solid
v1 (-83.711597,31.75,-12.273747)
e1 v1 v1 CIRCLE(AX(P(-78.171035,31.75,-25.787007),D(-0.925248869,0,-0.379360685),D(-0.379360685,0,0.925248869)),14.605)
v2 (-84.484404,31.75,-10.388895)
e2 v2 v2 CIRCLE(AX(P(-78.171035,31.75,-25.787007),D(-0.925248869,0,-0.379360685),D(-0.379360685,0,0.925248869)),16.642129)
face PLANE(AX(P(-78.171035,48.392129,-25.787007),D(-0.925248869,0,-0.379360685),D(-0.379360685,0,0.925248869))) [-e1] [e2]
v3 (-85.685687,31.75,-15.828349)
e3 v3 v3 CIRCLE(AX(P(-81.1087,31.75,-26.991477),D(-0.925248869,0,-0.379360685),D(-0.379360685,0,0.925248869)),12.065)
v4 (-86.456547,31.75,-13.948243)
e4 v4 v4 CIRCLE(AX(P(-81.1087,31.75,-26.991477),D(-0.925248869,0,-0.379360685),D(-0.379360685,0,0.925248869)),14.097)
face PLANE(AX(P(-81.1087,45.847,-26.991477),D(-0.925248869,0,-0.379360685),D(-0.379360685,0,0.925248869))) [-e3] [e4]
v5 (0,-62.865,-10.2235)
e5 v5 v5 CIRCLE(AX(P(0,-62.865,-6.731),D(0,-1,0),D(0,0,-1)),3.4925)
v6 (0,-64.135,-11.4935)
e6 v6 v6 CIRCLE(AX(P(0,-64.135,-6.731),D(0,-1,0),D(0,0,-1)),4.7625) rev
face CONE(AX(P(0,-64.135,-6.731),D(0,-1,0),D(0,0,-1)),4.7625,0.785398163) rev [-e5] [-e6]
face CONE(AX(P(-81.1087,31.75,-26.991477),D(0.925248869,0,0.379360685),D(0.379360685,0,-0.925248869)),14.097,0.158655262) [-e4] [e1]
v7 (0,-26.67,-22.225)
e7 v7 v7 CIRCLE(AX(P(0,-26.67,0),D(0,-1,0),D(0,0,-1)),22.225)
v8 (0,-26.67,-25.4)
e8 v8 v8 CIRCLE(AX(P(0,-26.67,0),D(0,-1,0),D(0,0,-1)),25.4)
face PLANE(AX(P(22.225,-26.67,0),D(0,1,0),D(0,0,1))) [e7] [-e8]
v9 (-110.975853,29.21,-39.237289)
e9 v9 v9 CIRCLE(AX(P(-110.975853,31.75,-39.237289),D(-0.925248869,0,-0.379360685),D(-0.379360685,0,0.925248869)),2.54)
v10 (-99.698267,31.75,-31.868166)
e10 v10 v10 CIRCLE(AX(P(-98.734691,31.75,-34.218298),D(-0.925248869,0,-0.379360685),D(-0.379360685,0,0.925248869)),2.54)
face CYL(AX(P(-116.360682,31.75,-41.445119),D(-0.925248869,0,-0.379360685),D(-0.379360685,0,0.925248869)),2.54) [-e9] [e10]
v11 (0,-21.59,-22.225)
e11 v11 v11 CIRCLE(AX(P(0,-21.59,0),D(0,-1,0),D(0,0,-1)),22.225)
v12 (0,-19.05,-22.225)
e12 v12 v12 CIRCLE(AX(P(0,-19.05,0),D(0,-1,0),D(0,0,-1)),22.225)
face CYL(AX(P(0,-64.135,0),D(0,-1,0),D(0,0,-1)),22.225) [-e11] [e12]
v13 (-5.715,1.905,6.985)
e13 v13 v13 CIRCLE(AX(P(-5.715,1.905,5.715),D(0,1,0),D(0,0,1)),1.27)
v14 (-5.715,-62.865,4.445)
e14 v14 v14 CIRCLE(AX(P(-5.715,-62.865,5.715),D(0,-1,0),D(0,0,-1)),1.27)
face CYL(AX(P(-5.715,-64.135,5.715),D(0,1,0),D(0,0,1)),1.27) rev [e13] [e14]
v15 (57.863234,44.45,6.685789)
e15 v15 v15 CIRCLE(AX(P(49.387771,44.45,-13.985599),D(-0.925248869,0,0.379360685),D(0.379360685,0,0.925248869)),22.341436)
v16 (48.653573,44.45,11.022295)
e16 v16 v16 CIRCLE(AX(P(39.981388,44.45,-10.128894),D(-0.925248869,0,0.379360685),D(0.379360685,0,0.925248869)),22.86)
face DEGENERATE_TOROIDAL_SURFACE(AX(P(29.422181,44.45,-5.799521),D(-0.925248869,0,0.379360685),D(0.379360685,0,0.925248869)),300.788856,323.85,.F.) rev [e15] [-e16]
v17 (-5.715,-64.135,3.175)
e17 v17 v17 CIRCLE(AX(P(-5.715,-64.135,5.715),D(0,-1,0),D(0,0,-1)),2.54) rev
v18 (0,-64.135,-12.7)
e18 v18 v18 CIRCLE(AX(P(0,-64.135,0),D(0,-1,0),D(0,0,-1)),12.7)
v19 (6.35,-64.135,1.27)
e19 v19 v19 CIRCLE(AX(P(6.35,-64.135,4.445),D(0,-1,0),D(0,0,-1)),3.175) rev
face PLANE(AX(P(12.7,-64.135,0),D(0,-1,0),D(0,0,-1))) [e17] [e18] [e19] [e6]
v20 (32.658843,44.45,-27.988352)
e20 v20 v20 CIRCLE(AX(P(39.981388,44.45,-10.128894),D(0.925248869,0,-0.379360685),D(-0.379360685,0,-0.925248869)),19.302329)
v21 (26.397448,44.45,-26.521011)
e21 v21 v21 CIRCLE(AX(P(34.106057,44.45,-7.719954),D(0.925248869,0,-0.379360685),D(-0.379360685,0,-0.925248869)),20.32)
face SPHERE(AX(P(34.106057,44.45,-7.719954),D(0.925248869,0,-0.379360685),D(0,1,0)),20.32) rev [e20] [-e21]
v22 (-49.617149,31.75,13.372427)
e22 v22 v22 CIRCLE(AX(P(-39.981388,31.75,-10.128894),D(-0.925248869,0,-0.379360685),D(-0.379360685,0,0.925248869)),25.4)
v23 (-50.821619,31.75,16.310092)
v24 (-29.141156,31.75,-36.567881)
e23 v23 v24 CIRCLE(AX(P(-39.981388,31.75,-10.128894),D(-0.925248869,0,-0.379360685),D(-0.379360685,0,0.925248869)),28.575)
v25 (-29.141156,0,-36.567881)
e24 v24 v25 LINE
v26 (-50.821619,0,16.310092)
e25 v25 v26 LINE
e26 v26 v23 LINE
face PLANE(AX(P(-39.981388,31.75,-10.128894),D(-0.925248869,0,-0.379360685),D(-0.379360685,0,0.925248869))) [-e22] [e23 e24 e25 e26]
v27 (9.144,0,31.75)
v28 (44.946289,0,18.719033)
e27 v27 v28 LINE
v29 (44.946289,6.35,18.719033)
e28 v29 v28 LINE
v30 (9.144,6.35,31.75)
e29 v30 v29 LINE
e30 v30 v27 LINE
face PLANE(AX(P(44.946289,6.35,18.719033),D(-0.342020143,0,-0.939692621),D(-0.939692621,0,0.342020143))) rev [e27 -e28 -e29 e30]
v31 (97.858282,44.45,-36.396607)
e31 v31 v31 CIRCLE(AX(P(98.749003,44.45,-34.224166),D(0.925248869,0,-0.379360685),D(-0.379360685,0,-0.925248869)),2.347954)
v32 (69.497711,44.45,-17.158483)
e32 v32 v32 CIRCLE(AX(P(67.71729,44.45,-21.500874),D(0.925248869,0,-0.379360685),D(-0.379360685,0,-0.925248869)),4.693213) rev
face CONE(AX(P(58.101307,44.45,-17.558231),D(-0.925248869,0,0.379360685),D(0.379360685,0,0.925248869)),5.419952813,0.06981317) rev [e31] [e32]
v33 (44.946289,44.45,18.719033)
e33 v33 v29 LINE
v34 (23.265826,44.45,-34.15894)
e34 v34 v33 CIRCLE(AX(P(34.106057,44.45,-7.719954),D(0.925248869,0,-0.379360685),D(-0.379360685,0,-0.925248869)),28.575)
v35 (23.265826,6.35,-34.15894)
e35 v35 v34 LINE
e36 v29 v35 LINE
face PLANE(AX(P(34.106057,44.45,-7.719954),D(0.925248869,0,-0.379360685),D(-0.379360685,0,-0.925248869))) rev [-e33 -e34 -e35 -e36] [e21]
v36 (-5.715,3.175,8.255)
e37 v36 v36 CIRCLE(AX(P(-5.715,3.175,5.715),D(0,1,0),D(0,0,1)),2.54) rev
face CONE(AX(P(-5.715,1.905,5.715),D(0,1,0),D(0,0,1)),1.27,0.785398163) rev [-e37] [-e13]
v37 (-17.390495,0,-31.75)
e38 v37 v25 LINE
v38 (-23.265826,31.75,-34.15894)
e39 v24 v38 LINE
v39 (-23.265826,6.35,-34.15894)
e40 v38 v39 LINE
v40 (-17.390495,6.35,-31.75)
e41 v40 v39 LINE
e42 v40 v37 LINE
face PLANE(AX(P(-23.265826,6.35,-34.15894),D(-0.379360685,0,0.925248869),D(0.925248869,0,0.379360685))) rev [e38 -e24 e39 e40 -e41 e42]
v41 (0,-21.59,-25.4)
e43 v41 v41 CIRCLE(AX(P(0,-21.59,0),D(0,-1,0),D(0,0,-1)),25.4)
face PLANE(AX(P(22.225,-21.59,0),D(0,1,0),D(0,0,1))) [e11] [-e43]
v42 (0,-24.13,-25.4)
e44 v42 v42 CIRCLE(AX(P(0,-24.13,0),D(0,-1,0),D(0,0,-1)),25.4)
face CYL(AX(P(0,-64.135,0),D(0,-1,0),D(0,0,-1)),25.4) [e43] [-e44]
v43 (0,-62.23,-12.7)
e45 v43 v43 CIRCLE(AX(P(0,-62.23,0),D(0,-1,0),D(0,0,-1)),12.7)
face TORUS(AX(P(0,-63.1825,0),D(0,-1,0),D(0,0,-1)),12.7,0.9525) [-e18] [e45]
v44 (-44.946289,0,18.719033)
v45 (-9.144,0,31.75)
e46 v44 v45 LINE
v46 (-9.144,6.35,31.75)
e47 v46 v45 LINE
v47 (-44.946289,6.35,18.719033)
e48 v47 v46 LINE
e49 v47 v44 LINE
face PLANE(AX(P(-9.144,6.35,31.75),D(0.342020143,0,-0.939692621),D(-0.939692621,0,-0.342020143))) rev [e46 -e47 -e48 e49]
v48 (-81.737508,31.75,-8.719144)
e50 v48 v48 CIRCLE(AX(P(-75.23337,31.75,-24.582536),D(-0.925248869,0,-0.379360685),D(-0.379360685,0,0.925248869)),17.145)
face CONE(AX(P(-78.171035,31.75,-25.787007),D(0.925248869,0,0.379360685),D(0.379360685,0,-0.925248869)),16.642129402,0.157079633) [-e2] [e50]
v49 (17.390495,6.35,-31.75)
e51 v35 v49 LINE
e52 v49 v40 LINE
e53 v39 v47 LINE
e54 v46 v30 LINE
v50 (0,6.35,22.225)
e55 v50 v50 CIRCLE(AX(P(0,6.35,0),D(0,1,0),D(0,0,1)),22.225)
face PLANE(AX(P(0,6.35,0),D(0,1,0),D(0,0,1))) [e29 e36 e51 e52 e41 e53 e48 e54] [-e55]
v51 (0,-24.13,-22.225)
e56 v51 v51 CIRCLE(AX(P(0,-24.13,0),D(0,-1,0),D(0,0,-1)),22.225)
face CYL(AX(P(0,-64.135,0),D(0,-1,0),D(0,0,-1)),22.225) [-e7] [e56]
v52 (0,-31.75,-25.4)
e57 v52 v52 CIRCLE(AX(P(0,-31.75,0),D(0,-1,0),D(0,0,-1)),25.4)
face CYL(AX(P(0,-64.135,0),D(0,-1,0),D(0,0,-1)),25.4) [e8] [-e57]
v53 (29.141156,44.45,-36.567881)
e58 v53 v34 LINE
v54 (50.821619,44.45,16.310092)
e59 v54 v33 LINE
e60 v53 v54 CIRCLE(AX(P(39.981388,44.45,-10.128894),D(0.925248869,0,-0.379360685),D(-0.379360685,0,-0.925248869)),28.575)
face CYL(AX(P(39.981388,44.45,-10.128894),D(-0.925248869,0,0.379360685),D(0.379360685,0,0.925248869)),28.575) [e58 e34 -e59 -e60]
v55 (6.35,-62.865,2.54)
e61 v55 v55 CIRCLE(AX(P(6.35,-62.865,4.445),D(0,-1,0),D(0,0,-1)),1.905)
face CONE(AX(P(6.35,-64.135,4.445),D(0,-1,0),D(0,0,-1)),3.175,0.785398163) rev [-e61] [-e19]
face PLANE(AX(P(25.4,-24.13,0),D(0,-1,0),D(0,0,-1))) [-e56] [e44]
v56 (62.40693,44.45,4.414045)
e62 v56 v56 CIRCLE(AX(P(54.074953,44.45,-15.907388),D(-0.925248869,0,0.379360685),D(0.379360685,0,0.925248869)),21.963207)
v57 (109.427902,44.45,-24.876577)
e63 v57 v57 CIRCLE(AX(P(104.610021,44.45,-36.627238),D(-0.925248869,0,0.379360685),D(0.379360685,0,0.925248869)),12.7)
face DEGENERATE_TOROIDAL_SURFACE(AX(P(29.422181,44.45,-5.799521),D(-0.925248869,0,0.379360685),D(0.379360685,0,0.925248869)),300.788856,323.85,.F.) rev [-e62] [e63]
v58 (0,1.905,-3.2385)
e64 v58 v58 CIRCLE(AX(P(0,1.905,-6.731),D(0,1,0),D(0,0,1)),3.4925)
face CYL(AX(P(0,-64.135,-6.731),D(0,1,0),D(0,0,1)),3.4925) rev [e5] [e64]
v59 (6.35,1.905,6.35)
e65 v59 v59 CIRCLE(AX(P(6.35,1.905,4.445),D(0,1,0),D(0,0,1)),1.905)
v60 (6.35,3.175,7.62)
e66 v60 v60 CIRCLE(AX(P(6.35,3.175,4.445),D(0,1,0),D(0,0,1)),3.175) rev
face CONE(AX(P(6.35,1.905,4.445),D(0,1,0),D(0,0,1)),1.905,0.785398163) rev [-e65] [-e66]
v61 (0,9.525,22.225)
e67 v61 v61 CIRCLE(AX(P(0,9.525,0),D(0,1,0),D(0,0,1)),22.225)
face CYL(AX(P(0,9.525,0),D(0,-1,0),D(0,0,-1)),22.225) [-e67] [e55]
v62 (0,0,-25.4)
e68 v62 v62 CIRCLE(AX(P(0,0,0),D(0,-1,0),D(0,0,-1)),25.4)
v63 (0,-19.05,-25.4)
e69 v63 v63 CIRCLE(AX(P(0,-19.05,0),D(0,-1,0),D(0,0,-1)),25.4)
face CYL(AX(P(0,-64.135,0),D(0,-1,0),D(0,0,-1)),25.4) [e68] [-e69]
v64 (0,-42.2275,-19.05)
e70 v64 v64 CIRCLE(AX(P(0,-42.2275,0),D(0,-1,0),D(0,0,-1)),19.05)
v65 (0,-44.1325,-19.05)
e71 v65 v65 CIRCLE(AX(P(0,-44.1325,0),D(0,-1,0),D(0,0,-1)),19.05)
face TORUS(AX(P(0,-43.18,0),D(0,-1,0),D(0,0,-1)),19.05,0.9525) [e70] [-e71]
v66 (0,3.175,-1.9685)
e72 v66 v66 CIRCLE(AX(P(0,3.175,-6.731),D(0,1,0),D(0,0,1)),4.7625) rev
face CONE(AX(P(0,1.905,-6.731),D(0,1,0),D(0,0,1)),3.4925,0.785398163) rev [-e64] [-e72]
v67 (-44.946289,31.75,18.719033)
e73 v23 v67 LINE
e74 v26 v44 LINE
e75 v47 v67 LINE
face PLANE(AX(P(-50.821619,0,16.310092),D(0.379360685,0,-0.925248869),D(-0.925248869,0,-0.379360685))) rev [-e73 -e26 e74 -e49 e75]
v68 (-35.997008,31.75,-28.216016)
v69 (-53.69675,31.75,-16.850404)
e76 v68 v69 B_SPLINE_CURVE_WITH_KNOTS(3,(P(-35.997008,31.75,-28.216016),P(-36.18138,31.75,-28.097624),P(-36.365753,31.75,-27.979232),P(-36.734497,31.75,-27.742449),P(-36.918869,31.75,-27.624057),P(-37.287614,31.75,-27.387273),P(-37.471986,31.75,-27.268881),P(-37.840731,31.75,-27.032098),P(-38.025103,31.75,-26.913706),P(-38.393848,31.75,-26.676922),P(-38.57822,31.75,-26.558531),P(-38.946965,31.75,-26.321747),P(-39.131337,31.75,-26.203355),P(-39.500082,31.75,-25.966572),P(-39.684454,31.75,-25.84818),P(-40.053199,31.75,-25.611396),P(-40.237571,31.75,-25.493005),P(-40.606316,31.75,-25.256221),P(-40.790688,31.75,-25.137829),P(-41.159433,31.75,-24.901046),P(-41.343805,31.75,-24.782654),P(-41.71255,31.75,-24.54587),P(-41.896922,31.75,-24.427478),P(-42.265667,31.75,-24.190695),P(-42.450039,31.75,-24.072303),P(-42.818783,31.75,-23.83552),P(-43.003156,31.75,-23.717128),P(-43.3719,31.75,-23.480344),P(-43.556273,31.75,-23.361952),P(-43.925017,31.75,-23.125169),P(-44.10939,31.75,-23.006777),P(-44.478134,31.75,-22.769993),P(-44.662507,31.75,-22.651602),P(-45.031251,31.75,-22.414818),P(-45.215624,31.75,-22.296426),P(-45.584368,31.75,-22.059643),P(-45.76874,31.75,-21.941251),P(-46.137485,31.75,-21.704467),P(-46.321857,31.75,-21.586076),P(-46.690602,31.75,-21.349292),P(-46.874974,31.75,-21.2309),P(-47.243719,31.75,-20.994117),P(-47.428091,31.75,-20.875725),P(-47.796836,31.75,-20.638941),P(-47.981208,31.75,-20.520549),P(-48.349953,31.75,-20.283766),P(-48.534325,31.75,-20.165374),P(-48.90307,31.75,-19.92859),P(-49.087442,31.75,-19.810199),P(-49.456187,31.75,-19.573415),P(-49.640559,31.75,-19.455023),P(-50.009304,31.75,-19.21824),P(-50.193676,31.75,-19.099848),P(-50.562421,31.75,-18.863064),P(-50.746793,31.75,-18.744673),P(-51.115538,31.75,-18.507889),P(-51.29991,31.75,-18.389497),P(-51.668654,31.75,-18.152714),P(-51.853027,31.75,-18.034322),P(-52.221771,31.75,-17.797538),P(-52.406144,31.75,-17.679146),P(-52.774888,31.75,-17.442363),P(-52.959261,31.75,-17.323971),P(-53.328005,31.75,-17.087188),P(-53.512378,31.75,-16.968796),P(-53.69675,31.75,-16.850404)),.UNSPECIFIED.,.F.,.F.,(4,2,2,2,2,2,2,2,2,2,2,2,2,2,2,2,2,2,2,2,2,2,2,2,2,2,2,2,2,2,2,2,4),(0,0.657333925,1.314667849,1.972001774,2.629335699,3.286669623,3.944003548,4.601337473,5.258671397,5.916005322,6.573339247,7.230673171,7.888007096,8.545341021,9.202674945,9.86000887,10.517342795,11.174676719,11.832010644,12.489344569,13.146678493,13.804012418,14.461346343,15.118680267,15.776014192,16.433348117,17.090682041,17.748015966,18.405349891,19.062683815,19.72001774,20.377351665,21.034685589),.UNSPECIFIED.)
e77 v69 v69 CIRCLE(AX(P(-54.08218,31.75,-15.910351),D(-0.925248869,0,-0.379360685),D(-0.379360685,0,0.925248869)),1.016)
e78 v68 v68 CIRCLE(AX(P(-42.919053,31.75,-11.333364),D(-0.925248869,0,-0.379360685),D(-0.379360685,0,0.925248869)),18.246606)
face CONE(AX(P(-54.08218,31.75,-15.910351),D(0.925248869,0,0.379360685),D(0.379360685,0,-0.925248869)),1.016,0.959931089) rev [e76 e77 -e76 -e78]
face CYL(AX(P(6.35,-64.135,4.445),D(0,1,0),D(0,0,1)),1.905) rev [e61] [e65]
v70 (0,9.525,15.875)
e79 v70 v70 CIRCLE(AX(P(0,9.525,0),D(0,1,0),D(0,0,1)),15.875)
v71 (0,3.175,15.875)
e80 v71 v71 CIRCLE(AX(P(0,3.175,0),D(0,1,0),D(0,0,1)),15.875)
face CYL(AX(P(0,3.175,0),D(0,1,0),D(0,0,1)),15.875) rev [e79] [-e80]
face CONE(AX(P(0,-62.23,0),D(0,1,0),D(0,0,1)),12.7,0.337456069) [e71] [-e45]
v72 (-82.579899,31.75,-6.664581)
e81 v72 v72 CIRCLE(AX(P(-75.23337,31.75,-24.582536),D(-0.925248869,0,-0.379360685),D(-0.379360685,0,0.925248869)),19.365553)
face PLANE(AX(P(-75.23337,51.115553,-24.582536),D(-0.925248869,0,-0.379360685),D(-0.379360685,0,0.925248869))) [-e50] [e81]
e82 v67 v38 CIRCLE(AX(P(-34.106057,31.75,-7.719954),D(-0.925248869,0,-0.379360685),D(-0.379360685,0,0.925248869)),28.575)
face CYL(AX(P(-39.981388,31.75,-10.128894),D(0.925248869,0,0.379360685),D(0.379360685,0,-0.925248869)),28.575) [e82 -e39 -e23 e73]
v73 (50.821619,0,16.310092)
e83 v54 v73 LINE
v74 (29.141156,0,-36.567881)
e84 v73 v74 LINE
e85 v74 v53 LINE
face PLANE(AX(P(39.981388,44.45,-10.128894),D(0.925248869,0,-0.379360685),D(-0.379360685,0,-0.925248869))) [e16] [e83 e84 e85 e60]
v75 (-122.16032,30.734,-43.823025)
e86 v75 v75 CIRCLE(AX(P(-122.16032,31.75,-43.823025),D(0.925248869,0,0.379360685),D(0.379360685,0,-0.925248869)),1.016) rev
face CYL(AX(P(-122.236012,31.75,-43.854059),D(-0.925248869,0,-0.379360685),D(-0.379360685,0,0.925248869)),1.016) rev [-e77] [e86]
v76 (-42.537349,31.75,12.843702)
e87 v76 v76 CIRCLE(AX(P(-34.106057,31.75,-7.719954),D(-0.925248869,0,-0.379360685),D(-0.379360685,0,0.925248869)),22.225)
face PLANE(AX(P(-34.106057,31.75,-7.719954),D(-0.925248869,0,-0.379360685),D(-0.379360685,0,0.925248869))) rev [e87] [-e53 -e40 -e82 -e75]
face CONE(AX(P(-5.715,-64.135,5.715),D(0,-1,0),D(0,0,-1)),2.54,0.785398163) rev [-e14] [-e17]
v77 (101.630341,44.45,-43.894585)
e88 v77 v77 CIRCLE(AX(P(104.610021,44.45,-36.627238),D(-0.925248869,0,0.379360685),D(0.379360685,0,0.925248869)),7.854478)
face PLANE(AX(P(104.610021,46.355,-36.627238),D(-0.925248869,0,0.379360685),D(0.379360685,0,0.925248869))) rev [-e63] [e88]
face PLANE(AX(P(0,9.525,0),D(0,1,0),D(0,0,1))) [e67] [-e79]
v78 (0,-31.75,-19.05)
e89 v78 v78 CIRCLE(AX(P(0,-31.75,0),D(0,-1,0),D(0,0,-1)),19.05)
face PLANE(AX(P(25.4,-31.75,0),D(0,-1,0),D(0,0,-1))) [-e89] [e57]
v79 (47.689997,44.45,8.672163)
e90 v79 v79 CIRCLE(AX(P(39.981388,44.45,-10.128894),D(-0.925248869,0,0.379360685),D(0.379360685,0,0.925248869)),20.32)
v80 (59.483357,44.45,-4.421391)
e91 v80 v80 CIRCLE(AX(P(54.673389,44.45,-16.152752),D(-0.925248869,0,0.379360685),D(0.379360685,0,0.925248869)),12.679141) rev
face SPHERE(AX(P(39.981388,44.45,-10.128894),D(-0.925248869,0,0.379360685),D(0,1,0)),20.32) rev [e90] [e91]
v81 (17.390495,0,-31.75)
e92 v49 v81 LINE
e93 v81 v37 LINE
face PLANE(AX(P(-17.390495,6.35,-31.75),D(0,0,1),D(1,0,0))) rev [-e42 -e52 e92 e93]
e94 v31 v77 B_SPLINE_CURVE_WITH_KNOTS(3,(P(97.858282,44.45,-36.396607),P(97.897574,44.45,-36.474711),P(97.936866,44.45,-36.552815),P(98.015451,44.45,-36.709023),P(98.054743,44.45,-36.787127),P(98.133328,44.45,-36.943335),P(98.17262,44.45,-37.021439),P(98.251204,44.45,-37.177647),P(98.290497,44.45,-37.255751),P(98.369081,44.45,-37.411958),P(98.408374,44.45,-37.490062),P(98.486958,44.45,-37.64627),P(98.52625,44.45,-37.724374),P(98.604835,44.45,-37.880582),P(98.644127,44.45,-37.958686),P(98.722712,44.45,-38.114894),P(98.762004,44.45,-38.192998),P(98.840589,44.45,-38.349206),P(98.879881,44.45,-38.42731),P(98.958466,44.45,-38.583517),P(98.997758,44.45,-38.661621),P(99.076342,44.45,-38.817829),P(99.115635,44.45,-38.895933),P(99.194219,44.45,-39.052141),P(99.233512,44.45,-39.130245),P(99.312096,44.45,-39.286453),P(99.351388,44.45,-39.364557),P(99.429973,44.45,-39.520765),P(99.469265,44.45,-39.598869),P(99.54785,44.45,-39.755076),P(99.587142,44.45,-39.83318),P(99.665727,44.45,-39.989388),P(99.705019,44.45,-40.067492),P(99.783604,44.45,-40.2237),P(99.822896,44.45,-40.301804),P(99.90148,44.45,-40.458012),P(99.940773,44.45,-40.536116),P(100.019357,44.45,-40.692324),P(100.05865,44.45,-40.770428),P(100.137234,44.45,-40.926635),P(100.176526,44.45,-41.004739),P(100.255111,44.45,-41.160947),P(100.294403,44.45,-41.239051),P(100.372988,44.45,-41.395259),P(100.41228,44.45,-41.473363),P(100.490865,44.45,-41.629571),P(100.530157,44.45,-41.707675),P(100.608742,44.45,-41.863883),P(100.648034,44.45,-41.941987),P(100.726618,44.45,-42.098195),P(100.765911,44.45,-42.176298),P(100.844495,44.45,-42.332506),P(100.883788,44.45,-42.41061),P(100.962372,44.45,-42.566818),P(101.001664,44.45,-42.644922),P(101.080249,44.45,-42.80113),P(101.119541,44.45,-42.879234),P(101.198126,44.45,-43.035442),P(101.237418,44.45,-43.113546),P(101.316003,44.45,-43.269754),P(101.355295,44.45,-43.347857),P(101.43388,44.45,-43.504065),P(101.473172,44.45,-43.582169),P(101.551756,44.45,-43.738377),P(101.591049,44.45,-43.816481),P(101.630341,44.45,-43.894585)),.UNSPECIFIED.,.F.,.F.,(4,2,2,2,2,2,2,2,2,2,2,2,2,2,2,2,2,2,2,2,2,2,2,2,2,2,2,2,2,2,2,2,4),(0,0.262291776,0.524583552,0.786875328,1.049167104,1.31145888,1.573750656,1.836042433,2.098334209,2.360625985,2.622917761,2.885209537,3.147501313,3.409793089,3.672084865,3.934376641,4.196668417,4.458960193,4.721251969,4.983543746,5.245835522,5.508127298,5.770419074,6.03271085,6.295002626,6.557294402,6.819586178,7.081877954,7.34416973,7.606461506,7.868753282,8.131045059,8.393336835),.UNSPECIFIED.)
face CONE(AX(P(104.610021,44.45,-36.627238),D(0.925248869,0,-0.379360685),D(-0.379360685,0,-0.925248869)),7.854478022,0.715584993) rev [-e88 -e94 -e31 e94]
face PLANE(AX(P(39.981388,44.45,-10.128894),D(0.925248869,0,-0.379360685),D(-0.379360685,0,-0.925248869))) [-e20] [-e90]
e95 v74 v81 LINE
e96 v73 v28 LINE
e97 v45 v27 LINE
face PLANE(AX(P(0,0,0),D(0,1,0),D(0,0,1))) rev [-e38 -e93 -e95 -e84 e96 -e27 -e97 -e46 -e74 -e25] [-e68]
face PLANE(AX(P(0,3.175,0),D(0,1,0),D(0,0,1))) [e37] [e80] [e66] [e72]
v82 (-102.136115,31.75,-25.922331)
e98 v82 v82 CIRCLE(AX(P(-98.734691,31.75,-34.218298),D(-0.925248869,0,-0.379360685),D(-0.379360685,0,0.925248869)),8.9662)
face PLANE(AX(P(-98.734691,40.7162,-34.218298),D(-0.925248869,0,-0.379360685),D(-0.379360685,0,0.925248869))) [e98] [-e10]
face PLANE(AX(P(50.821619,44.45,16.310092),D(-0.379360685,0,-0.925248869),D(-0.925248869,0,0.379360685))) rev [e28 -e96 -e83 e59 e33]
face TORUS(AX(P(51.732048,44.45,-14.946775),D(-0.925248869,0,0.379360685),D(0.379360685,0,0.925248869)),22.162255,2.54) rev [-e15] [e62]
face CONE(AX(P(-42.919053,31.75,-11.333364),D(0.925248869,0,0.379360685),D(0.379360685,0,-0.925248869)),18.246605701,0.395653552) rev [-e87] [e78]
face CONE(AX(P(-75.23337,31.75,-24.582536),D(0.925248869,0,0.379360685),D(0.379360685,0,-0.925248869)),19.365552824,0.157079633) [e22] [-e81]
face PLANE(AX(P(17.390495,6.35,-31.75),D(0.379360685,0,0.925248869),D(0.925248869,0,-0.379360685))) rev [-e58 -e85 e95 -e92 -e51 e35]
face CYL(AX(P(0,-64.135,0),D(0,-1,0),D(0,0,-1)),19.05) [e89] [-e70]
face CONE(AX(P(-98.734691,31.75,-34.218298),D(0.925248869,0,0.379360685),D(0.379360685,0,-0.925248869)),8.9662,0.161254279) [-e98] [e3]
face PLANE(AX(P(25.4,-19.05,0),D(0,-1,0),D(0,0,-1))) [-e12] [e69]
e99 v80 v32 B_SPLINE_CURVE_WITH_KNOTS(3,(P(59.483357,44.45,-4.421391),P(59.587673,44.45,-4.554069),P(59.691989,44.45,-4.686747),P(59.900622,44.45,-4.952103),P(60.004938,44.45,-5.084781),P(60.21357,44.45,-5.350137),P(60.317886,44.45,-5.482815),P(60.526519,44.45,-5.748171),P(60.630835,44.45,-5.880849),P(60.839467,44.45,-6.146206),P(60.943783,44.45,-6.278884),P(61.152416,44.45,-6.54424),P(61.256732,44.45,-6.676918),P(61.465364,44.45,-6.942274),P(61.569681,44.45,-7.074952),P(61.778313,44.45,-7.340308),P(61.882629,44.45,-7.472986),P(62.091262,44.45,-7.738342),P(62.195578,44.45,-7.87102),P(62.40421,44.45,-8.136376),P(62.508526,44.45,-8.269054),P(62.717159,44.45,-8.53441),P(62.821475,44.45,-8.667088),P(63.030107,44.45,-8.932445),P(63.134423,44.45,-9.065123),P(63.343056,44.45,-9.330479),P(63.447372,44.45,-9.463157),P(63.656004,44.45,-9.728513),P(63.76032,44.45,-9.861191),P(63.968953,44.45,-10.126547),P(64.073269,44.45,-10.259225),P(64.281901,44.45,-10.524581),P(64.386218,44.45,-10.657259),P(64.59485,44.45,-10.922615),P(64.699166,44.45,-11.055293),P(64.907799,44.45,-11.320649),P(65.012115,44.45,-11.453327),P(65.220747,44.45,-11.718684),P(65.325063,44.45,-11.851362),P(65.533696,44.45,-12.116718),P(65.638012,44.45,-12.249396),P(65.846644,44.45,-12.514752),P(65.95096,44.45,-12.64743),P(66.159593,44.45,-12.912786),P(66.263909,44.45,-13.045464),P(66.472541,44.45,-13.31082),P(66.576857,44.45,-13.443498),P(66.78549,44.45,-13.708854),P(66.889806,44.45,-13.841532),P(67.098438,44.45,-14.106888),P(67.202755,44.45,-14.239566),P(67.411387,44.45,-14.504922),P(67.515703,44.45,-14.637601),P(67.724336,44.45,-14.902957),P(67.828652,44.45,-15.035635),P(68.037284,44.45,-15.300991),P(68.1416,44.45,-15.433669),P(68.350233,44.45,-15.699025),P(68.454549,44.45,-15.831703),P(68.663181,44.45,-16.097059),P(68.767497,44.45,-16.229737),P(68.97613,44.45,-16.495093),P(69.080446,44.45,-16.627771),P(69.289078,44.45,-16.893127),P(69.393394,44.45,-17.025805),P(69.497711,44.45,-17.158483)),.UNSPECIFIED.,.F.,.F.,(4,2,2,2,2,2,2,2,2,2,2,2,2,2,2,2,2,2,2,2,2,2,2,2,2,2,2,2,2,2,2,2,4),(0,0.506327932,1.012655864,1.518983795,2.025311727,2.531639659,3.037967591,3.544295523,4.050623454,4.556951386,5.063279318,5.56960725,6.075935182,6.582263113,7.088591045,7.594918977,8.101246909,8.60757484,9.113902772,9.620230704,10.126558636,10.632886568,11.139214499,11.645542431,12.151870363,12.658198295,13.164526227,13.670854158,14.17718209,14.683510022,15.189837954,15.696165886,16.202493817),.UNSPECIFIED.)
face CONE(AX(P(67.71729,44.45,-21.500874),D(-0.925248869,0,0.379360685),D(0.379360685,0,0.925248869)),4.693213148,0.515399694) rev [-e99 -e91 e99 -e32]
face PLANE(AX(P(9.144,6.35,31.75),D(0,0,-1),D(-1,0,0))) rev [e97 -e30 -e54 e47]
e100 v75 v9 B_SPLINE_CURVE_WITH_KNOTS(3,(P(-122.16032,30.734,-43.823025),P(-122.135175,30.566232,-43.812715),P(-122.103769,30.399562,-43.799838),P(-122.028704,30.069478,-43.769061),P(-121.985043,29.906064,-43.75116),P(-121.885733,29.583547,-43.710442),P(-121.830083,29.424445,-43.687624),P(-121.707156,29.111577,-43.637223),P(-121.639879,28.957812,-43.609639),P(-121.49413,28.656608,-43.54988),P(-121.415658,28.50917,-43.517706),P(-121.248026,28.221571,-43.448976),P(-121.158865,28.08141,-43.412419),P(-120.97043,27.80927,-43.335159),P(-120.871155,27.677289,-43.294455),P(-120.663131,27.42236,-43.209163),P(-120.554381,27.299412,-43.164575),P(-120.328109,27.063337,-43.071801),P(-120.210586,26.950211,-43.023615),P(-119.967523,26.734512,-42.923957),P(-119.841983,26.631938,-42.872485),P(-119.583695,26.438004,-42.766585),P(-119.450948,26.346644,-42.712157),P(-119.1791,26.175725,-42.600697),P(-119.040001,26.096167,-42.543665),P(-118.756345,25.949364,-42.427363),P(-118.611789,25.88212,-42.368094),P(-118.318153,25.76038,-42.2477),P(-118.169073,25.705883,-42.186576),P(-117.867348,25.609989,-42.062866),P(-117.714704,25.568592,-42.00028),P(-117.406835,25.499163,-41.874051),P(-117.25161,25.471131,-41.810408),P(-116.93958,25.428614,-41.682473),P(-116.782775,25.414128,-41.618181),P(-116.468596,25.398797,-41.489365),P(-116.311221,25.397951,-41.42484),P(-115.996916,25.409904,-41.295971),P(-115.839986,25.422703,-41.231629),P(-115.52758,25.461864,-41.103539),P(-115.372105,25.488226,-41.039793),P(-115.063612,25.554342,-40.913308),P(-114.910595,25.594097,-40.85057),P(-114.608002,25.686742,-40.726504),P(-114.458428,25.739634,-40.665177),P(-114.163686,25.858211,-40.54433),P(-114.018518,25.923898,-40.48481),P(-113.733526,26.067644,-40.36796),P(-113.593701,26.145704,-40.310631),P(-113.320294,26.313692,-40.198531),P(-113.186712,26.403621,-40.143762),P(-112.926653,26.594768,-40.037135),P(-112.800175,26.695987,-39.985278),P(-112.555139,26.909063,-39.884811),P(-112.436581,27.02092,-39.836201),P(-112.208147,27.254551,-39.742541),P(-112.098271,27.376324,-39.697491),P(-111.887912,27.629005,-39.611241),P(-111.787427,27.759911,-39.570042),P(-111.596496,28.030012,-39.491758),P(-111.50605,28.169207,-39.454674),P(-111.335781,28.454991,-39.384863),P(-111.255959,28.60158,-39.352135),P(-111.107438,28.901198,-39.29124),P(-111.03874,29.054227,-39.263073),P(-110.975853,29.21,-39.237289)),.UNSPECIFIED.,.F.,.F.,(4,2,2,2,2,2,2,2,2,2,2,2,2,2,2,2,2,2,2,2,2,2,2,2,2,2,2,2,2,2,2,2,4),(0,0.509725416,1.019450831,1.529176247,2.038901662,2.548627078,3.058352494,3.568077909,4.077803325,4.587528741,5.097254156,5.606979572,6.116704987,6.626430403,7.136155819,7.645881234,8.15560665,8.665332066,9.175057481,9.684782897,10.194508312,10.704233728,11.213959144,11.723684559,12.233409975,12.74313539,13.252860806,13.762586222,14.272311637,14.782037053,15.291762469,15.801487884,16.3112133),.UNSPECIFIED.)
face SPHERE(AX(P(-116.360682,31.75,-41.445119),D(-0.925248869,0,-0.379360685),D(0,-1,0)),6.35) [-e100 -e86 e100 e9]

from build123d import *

# Parameters (mm, degrees)
BOSS_EXTRUDE1_DEPTH = 6.35
BOSS_EXTRUDE2_DEPTH = 6.35
BOSS_EXTRUDE3_DEPTH = 6.35
CHAMFER1_SIZE       = 10.418239717
CHAMFER1_SIZE_2     = 6.35
CHAMFER1_SIZE_3     = 5.949478022
SKETCH11_R          = 22.225
BOSS_EXTRUDE4_DEPTH = 3.175
SKETCH12_R          = 15.875
CUT_EXTRUDE2_DEPTH  = 6.35
SKETCH10_R          = 3.4925
SKETCH10_R_2        = 1.905
SKETCH10_R_3        = 1.27
CUT_EXTRUDE1_DEPTH  = 150.554230109
CHAMFER2_SIZE       = 1.27


with BuildPart() as part:
    # Sketch1 → Revolve1 (revolve)
    with BuildSketch(Plane.XY, mode=Mode.PRIVATE) as revolve1_sk:
        with BuildLine():
            Line((0, 0), (25.4, 0))
            Line((25.4, 0), (25.4, -19.05))
            Line((25.4, -19.05), (22.225, -19.05))
            Line((22.225, -19.05), (22.225, -21.59))
            Line((22.225, -21.59), (25.4, -21.59))
            Line((25.4, -21.59), (25.4, -24.13))
            Line((25.4, -24.13), (22.225, -24.13))
            Line((22.225, -24.13), (22.225, -26.67))
            Line((22.225, -26.67), (25.4, -26.67))
            Line((25.4, -26.67), (25.4, -31.75))
            Line((25.4, -31.75), (19.05, -31.75))
            Line((19.05, -31.75), (19.05, -42.2275))
            ThreePointArc((19.05, -42.2275), (20.0025, -43.18), (19.05, -44.1325))
            Line((19.05, -44.1325), (12.7, -62.23))
            ThreePointArc((12.7, -62.23), (13.6525, -63.1825), (12.7, -64.135))
            Line((12.7, -64.135), (0, -64.135))
            Line((0, -64.135), (0, 0))
        make_face()
    revolve(revolve1_sk.sketch.rotate(Axis((0, -64.135, 0), (0, 1, 0)), 90), axis=Axis((0, -64.135, 0), (0, 1, 0)))

    # Sketch2 → Boss-Extrude1 (add)
    with BuildSketch(Plane(origin=(0, 0, 0), x_dir=(1, 0, 0), z_dir=(0, 1, 0))):
        Polygon((-17.390495368, 31.75), (17.390495368, 31.75), (23.265825689, 34.158940351), (44.946288852, -18.719032539), (9.144, -31.75), (-9.144, -31.75), (-44.946288852, -18.719032539), (-23.265825689, 34.158940351), align=None)
    extrude(amount=BOSS_EXTRUDE1_DEPTH)

    # Sketch3 → Boss-Extrude2 (add)
    with BuildSketch(Plane(origin=(31.907427414, 0, -13.082343495), x_dir=(-0.37936068526822037, 0, -0.9252488694793559), z_dir=(0.9252488694793559, 0, -0.37936068526822037))):
        with BuildLine():
            Line((-34.370618634, 44.45), (-34.370618634, 0))
            Line((-34.370618634, 0), (22.779381366, 0))
            Line((22.779381366, 0), (22.779381366, 44.45))
            ThreePointArc((22.779381366, 44.45), (-5.795618634, 73.025), (-34.370618634, 44.45))
        make_face()
    extrude(amount=BOSS_EXTRUDE2_DEPTH)

    # Sketch4 → Boss-Extrude3 (add)
    with BuildSketch(Plane(origin=(-31.907427414, 0, -13.082343495), x_dir=(-0.3793606852682203, 0, 0.9252488694793559), z_dir=(-0.9252488694793559, 0, -0.3793606852682203))):
        with BuildLine():
            Line((34.370618634, 0), (34.370618634, 31.75))
            ThreePointArc((34.370618634, 31.75), (5.795618634, 60.325), (-22.779381366, 31.75))
            Line((-22.779381366, 31.75), (-22.779381366, 0))
            Line((-22.779381366, 0), (34.370618634, 0))
        make_face()
    extrude(amount=BOSS_EXTRUDE3_DEPTH)

    # Sketch6 → Revolve2 (revolve)
    with BuildSketch(Plane(origin=(2.198629856, 0, 5.362389589), x_dir=(0.9252488694793561, 0, -0.37936068526822003), z_dir=(0.37936068526822003, 0, 0.9252488694793563)), mode=Mode.PRIVATE) as revolve2_sk:
        with BuildLine():
            Line((110.685237936, 46.355), (110.685237936, 57.15))
            ThreePointArc((110.685237936, 57.15), (83.574766362, 62.951612182), (56.067426717, 66.413206982))
            ThreePointArc((56.067426717, 66.413206982), (53.34612195, 64.079304761), (51.001565892, 66.791436046))
            ThreePointArc((51.001565892, 66.791436046), (45.920439536, 67.090665137), (40.835237936, 67.31))
            Line((40.835237936, 67.31), (40.835237936, 64.77))
            ThreePointArc((40.835237936, 64.77), (53.139077963, 60.621515717), (60.419070847, 49.869952813))
            Line((60.419070847, 49.869952813), (110.685237936, 46.355))
        make_face()
    revolve(revolve2_sk.sketch.rotate(Axis((39.981387592, 44.45, -10.128894258), (0.9252488694793561, 0, -0.37936068526822)), 90), axis=Axis((39.981387592, 44.45, -10.128894258), (0.9252488694793561, 0, -0.37936068526822)))

    # Sketch7 → Cut-Revolve1 (revolve, cut)
    with BuildSketch(Plane(origin=(2.198629856, 0, 5.362389589), x_dir=(0.9252488694793561, 0, -0.37936068526822003), z_dir=(0.37936068526822003, 0, 0.9252488694793563)), mode=Mode.PRIVATE) as cut_revolve1_sk:
        with BuildLine():
            Line((110.685237936, 44.45), (34.485237936, 44.45))
            Line((34.485237936, 44.45), (34.485237936, 64.77))
            ThreePointArc((34.485237936, 64.77), (46.600514797, 60.763260452), (53.937961055, 50.323156159))
            Line((53.937961055, 50.323156159), (110.685237936, 46.355))
            Line((110.685237936, 46.355), (110.685237936, 44.45))
        make_face()
    revolve(cut_revolve1_sk.sketch.rotate(Axis((104.610021125, 44.45, -36.627238124), (-0.9252488694793561, 0, 0.37936068526822)), 270), axis=Axis((104.610021125, 44.45, -36.627238124), (-0.9252488694793561, 0, 0.37936068526822)), mode=Mode.SUBTRACT)

    # Chamfer1
    # the kernel refuses this chamfer: 10.418239717, 6.35, 5.949478022 mm, written as the material it takes off along each edge
    with BuildSketch(Plane(origin=(58.101306853, 44.45, -17.558230531), x_dir=(0.3793606852682194, -1.3109758705645162e-15, 0.9252488694793563), z_dir=(0, 1, 0))) as chamfer1_piece_1:
        with BuildLine():
            Line((12.679141411, -3.70486024), (5.419952813 - CHAMFER1_SIZE * 0.0697564737426, CHAMFER1_SIZE * 0.997564050239))
            Line((5.419952813 - CHAMFER1_SIZE * 0.0697564737426, CHAMFER1_SIZE * 0.997564050239), (5.419952813, 0))
            ThreePointArc((5.419952813, 0), (9.395846761, -1.566606054), (12.679141411, -3.70486024))
        make_face()
    revolve(axis=Axis((58.101306853, 44.45, -17.558230531), (0.9252488694793561, 0, -0.37936068526822)), mode=Mode.SUBTRACT)
    with BuildSketch(Plane(origin=(104.610021125, 44.45, -36.627238124), x_dir=(0.37936068526821753, 0, 0.9252488694793571), z_dir=(0, 1, 0))) as chamfer1_piece_2:
        Polygon((1.905 + CHAMFER1_SIZE_2 * 0.0697564737441, -CHAMFER1_SIZE_2 * 0.99756405026), (1.905 + CHAMFER1_SIZE_3, 0), (1.905, 0), align=None)
    revolve(axis=Axis((104.610021125, 44.45, -36.627238124), (0.9252488694793561, 0, -0.37936068526822)), mode=Mode.SUBTRACT)

    # Sketch8 → Revolve3 (revolve)
    with BuildSketch(Plane(origin=(-2.198629856, 0, 5.362389589), x_dir=(-0.9252488694793564, 0, -0.37936068526821937), z_dir=(0.37936068526821937, 0, -0.9252488694793564)), mode=Mode.PRIVATE) as revolve3_sk:
        with BuildLine():
            Line((40.835237936, 57.15), (78.935237936, 51.115552824))
            Line((78.935237936, 51.115552824), (78.935237936, 48.895))
            Line((78.935237936, 48.895), (82.110237936, 48.392129402))
            Line((82.110237936, 48.392129402), (82.110237936, 46.355))
            Line((82.110237936, 46.355), (85.285237936, 45.847))
            Line((85.285237936, 45.847), (85.285237936, 43.815))
            Line((85.285237936, 43.815), (104.335237936, 40.7162))
            Line((104.335237936, 40.7162), (104.335237936, 34.29))
            Line((104.335237936, 34.29), (117.565366803, 34.29))
            ThreePointArc((117.565366803, 34.29), (124.682604173, 37.966055087), (129.735237936, 31.75))
            Line((129.735237936, 31.75), (123.385237936, 31.75))
            Line((123.385237936, 31.75), (40.835237936, 31.75))
            Line((40.835237936, 31.75), (40.835237936, 57.15))
        make_face()
    revolve(revolve3_sk.sketch.rotate(Axis((-116.360681767, 31.75, -41.445118826), (0.9252488694793564, 0, 0.3793606852682194)), 90), axis=Axis((-116.360681767, 31.75, -41.445118826), (0.9252488694793564, 0, 0.3793606852682194)))

    # Sketch9 → Cut-Revolve2 (revolve, cut)
    with BuildSketch(Plane(origin=(-2.198629856, 0, 5.362389589), x_dir=(-0.9252488694793564, 0, -0.37936068526821937), z_dir=(0.37936068526821937, 0, -0.9252488694793564)), mode=Mode.PRIVATE) as cut_revolve2_sk:
        Polygon((34.485237936, 53.975), (44.010237936, 49.996605701), (56.075237936, 32.766), (129.735237936, 32.766), (129.735237936, 31.75), (34.485237936, 31.75), align=None)
    revolve(cut_revolve2_sk.sketch.rotate(Axis((-122.236012088, 31.75, -43.854059178), (0.9252488694793564, 0, 0.37936068526821937)), 180), axis=Axis((-122.236012088, 31.75, -43.854059178), (0.9252488694793564, 0, 0.37936068526821937)), mode=Mode.SUBTRACT)

    # Sketch11 → Boss-Extrude4 (add)
    with BuildSketch(Plane(origin=(0, 6.35, 0), x_dir=(1, 0, 0), z_dir=(0, 1, 0))):
        with Locations(Location((0, 0, 0), (0, 0, 90))):
            Circle(SKETCH11_R)
    extrude(amount=BOSS_EXTRUDE4_DEPTH)

    # Sketch12 → Cut-Extrude2 (cut)
    with BuildSketch(Plane(origin=(0, 9.525, 0), x_dir=(1, 0, 0), z_dir=(0, 1, 0))):
        with Locations(Location((0, 0, 0), (0, 0, 270))):
            Circle(SKETCH12_R)
    extrude(amount=-CUT_EXTRUDE2_DEPTH, mode=Mode.SUBTRACT)

    # Sketch10 → Cut-Extrude1 (cut, through all)
    with BuildSketch(Plane(origin=(0, 6.35, 0), x_dir=(1, 0, 0), z_dir=(0, 1, 0))):
        with Locations(Location((0, 6.731, 0), (0, 0, 270))):
            Circle(SKETCH10_R)
        with Locations(Location((6.35, -4.445, 0), (0, 0, 270))):
            Circle(SKETCH10_R_2)
        with Locations(Location((-5.715, -5.715, 0), (0, 0, 270))):
            Circle(SKETCH10_R_3)
    extrude(amount=-CUT_EXTRUDE1_DEPTH, mode=Mode.SUBTRACT)

    # Chamfer2
    chamfer2_edges = [part.edges().sort_by_distance(p)[0] for p in [
        (0, 3.175, -10.2235),
        (0, -64.135, -10.2235),
        (6.35, 3.175, 2.54),
        (6.35, -64.135, 2.54),
        (-5.715, 3.175, 4.445),
        (-5.715, -64.135, 4.445),
    ]]
    chamfer(chamfer2_edges, length=CHAMFER2_SIZE)


solid = part.part
